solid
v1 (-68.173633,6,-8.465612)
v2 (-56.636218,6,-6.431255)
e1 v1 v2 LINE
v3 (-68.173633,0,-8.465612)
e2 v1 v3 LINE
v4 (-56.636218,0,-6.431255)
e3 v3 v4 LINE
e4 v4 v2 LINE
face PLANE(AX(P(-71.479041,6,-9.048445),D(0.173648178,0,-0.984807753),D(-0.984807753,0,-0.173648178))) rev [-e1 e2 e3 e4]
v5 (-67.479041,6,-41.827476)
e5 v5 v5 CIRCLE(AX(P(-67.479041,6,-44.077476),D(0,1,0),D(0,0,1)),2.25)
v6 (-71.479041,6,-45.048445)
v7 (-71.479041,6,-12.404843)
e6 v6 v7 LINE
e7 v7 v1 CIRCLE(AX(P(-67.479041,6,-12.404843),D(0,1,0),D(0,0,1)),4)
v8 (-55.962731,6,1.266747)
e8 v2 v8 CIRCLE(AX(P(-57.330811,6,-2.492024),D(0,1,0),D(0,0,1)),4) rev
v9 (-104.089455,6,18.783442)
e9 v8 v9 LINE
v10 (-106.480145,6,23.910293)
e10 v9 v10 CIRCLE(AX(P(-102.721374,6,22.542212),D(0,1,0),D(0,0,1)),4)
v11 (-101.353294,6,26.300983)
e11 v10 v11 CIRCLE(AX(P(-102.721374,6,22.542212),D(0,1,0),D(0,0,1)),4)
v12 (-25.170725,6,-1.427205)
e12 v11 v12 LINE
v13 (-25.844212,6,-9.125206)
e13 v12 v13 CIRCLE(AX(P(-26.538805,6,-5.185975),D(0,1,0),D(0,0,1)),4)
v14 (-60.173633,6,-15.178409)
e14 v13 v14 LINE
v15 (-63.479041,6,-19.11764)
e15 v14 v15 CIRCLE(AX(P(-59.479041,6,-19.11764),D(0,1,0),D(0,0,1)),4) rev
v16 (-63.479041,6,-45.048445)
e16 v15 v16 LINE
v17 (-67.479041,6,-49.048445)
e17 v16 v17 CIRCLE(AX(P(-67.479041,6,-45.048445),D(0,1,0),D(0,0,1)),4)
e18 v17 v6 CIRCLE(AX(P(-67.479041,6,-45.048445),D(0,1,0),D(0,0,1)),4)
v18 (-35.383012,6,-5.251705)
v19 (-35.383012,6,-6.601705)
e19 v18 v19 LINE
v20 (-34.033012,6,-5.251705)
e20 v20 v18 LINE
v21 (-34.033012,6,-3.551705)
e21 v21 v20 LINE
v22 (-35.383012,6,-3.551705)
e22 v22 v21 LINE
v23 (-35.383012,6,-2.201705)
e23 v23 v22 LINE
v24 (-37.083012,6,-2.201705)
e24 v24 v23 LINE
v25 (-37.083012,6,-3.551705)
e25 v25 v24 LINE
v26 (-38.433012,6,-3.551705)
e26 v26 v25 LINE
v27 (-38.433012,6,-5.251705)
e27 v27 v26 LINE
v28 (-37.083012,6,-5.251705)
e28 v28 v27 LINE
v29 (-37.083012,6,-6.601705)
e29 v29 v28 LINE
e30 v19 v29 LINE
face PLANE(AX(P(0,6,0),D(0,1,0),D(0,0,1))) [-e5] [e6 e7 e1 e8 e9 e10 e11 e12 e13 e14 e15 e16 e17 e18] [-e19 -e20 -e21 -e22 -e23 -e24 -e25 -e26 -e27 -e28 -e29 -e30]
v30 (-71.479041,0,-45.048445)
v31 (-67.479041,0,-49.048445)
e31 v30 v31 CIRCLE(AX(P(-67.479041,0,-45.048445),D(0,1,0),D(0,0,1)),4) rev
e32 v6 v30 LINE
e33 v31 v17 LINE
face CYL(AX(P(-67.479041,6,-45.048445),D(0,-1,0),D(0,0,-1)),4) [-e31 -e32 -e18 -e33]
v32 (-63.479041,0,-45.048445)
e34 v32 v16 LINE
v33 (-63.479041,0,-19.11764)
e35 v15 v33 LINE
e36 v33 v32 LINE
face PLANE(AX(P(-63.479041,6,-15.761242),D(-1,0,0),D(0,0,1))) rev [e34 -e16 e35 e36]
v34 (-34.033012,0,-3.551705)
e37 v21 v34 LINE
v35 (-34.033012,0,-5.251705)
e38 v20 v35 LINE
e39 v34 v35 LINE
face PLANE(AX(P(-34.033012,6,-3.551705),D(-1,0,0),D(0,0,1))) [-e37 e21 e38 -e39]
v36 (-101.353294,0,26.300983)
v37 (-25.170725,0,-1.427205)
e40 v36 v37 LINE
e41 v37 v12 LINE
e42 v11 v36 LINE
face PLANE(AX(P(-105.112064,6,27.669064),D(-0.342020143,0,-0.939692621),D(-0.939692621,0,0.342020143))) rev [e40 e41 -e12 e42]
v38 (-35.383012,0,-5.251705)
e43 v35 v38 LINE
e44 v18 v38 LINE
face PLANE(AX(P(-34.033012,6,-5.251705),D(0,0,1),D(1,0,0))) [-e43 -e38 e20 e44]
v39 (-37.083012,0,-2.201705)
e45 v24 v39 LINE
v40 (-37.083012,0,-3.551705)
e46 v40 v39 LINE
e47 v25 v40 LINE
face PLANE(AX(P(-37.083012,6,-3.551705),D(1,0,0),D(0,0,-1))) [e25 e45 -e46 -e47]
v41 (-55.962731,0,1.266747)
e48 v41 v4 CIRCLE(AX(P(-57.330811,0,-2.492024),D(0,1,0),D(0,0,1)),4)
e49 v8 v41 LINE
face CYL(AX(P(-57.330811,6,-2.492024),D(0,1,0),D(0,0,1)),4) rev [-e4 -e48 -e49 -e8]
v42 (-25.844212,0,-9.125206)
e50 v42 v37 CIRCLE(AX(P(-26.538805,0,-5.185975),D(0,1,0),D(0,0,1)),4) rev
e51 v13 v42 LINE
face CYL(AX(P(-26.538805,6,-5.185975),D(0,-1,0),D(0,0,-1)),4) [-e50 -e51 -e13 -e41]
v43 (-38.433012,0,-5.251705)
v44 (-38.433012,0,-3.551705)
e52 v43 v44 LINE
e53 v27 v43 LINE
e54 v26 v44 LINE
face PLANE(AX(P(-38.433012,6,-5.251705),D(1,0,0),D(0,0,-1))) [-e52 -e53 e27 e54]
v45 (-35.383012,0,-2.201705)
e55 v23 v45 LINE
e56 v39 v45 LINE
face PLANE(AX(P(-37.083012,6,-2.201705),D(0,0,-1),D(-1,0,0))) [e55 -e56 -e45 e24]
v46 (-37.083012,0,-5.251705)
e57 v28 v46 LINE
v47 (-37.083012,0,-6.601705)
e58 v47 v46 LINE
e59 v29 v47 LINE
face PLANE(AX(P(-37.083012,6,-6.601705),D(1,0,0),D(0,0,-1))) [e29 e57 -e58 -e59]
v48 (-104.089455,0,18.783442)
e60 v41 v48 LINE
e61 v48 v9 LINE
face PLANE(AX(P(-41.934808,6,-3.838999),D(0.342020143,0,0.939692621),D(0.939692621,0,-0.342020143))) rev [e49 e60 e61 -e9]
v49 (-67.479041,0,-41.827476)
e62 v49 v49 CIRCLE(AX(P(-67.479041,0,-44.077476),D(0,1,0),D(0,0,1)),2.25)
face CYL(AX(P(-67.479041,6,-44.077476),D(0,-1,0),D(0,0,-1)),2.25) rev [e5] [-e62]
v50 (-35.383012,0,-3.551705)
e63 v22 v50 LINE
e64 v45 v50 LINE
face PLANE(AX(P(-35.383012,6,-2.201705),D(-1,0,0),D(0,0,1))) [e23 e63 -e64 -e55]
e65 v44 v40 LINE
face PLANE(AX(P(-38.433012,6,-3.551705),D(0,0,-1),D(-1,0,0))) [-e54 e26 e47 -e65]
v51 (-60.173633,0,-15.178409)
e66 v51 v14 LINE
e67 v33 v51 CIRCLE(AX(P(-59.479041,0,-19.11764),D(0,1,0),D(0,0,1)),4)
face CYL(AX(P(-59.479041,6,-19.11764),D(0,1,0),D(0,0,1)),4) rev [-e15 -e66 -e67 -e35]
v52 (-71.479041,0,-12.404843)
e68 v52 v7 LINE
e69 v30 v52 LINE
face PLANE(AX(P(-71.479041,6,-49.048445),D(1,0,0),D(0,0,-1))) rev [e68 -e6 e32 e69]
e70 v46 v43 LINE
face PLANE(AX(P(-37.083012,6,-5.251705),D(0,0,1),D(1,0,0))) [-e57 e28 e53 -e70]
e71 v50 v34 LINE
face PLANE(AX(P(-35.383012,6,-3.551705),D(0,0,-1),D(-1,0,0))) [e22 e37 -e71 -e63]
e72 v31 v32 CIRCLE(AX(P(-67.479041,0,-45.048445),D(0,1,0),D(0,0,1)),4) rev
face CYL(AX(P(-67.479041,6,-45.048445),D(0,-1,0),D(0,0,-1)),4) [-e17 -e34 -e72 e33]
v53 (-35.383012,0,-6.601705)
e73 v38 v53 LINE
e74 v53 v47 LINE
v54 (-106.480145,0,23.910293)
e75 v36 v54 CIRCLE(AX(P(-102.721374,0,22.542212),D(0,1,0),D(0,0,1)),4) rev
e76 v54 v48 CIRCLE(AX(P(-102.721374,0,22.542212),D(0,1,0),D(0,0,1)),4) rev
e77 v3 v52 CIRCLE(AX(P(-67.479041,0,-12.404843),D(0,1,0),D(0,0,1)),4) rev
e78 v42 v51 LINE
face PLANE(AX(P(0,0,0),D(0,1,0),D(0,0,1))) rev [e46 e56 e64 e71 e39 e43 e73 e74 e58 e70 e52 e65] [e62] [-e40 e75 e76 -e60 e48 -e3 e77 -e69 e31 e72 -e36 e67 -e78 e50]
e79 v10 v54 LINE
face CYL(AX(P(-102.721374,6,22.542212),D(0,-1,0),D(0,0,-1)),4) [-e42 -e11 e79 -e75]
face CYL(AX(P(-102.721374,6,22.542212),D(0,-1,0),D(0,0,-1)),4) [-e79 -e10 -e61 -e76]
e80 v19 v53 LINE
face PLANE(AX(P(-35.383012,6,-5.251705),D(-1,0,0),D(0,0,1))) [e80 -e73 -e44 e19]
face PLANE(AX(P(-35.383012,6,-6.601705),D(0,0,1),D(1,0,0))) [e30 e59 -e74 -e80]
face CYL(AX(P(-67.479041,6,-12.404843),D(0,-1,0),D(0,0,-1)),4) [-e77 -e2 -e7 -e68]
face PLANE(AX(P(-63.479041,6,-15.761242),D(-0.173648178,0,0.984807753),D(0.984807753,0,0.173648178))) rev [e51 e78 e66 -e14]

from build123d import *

# Parameters (mm, degrees)
SKETCH1_R           = 2.25
BOSS_EXTRUDE1_DEPTH = 6
FILLET1_R           = 4


with BuildPart() as part:
    # Sketch1 → Boss-Extrude1 (new body)
    with BuildSketch(Plane(origin=(0, 0, 0), x_dir=(1, 0, 0), z_dir=(0, 1, 0))):
        Polygon((-71.479040749, 49.048444694), (-71.479040749, 9.048444694), (-41.934808158, 3.838999364), (-107.848225403, -20.151522552), (-105.112064256, -27.669063518), (-11.142802178, 6.532950815), (-63.479040749, 15.761241744), (-63.479040749, 49.048444694), align=None)
        with Locations(Location((-67.479040749, 44.077475717, 0), (0, 0, 270))):
            Circle(SKETCH1_R, mode=Mode.SUBTRACT)
        Polygon((-38.433012349, 5.25170526), (-38.433012349, 3.55170526), (-37.083012349, 3.55170526), (-37.083012349, 2.20170526), (-35.383012349, 2.20170526), (-35.383012349, 3.55170526), (-34.033012349, 3.55170526), (-34.033012349, 5.25170526), (-35.383012349, 5.25170526), (-35.383012349, 6.60170526), (-37.083012349, 6.60170526), (-37.083012349, 5.25170526), align=None, mode=Mode.SUBTRACT)
    extrude(amount=BOSS_EXTRUDE1_DEPTH)

    # Fillet1
    fillet1_edges = [part.edges().sort_by_distance(p)[0] for p in [
        (-63.479040749, 3, -15.761241744),
        (-71.479040749, 3, -9.048444694),
        (-105.112064256, 3, 27.669063518),
        (-107.848225403, 3, 20.151522552),
        (-41.934808158, 3, -3.838999364),
        (-11.142802178, 3, -6.532950815),
        (-63.479040749, 3, -49.048444694),
        (-71.479040749, 3, -49.048444694),
    ]]
    fillet(fillet1_edges, radius=FILLET1_R - 0.0001)  # a hair under: the kernel refuses the full size


solid = part.part
